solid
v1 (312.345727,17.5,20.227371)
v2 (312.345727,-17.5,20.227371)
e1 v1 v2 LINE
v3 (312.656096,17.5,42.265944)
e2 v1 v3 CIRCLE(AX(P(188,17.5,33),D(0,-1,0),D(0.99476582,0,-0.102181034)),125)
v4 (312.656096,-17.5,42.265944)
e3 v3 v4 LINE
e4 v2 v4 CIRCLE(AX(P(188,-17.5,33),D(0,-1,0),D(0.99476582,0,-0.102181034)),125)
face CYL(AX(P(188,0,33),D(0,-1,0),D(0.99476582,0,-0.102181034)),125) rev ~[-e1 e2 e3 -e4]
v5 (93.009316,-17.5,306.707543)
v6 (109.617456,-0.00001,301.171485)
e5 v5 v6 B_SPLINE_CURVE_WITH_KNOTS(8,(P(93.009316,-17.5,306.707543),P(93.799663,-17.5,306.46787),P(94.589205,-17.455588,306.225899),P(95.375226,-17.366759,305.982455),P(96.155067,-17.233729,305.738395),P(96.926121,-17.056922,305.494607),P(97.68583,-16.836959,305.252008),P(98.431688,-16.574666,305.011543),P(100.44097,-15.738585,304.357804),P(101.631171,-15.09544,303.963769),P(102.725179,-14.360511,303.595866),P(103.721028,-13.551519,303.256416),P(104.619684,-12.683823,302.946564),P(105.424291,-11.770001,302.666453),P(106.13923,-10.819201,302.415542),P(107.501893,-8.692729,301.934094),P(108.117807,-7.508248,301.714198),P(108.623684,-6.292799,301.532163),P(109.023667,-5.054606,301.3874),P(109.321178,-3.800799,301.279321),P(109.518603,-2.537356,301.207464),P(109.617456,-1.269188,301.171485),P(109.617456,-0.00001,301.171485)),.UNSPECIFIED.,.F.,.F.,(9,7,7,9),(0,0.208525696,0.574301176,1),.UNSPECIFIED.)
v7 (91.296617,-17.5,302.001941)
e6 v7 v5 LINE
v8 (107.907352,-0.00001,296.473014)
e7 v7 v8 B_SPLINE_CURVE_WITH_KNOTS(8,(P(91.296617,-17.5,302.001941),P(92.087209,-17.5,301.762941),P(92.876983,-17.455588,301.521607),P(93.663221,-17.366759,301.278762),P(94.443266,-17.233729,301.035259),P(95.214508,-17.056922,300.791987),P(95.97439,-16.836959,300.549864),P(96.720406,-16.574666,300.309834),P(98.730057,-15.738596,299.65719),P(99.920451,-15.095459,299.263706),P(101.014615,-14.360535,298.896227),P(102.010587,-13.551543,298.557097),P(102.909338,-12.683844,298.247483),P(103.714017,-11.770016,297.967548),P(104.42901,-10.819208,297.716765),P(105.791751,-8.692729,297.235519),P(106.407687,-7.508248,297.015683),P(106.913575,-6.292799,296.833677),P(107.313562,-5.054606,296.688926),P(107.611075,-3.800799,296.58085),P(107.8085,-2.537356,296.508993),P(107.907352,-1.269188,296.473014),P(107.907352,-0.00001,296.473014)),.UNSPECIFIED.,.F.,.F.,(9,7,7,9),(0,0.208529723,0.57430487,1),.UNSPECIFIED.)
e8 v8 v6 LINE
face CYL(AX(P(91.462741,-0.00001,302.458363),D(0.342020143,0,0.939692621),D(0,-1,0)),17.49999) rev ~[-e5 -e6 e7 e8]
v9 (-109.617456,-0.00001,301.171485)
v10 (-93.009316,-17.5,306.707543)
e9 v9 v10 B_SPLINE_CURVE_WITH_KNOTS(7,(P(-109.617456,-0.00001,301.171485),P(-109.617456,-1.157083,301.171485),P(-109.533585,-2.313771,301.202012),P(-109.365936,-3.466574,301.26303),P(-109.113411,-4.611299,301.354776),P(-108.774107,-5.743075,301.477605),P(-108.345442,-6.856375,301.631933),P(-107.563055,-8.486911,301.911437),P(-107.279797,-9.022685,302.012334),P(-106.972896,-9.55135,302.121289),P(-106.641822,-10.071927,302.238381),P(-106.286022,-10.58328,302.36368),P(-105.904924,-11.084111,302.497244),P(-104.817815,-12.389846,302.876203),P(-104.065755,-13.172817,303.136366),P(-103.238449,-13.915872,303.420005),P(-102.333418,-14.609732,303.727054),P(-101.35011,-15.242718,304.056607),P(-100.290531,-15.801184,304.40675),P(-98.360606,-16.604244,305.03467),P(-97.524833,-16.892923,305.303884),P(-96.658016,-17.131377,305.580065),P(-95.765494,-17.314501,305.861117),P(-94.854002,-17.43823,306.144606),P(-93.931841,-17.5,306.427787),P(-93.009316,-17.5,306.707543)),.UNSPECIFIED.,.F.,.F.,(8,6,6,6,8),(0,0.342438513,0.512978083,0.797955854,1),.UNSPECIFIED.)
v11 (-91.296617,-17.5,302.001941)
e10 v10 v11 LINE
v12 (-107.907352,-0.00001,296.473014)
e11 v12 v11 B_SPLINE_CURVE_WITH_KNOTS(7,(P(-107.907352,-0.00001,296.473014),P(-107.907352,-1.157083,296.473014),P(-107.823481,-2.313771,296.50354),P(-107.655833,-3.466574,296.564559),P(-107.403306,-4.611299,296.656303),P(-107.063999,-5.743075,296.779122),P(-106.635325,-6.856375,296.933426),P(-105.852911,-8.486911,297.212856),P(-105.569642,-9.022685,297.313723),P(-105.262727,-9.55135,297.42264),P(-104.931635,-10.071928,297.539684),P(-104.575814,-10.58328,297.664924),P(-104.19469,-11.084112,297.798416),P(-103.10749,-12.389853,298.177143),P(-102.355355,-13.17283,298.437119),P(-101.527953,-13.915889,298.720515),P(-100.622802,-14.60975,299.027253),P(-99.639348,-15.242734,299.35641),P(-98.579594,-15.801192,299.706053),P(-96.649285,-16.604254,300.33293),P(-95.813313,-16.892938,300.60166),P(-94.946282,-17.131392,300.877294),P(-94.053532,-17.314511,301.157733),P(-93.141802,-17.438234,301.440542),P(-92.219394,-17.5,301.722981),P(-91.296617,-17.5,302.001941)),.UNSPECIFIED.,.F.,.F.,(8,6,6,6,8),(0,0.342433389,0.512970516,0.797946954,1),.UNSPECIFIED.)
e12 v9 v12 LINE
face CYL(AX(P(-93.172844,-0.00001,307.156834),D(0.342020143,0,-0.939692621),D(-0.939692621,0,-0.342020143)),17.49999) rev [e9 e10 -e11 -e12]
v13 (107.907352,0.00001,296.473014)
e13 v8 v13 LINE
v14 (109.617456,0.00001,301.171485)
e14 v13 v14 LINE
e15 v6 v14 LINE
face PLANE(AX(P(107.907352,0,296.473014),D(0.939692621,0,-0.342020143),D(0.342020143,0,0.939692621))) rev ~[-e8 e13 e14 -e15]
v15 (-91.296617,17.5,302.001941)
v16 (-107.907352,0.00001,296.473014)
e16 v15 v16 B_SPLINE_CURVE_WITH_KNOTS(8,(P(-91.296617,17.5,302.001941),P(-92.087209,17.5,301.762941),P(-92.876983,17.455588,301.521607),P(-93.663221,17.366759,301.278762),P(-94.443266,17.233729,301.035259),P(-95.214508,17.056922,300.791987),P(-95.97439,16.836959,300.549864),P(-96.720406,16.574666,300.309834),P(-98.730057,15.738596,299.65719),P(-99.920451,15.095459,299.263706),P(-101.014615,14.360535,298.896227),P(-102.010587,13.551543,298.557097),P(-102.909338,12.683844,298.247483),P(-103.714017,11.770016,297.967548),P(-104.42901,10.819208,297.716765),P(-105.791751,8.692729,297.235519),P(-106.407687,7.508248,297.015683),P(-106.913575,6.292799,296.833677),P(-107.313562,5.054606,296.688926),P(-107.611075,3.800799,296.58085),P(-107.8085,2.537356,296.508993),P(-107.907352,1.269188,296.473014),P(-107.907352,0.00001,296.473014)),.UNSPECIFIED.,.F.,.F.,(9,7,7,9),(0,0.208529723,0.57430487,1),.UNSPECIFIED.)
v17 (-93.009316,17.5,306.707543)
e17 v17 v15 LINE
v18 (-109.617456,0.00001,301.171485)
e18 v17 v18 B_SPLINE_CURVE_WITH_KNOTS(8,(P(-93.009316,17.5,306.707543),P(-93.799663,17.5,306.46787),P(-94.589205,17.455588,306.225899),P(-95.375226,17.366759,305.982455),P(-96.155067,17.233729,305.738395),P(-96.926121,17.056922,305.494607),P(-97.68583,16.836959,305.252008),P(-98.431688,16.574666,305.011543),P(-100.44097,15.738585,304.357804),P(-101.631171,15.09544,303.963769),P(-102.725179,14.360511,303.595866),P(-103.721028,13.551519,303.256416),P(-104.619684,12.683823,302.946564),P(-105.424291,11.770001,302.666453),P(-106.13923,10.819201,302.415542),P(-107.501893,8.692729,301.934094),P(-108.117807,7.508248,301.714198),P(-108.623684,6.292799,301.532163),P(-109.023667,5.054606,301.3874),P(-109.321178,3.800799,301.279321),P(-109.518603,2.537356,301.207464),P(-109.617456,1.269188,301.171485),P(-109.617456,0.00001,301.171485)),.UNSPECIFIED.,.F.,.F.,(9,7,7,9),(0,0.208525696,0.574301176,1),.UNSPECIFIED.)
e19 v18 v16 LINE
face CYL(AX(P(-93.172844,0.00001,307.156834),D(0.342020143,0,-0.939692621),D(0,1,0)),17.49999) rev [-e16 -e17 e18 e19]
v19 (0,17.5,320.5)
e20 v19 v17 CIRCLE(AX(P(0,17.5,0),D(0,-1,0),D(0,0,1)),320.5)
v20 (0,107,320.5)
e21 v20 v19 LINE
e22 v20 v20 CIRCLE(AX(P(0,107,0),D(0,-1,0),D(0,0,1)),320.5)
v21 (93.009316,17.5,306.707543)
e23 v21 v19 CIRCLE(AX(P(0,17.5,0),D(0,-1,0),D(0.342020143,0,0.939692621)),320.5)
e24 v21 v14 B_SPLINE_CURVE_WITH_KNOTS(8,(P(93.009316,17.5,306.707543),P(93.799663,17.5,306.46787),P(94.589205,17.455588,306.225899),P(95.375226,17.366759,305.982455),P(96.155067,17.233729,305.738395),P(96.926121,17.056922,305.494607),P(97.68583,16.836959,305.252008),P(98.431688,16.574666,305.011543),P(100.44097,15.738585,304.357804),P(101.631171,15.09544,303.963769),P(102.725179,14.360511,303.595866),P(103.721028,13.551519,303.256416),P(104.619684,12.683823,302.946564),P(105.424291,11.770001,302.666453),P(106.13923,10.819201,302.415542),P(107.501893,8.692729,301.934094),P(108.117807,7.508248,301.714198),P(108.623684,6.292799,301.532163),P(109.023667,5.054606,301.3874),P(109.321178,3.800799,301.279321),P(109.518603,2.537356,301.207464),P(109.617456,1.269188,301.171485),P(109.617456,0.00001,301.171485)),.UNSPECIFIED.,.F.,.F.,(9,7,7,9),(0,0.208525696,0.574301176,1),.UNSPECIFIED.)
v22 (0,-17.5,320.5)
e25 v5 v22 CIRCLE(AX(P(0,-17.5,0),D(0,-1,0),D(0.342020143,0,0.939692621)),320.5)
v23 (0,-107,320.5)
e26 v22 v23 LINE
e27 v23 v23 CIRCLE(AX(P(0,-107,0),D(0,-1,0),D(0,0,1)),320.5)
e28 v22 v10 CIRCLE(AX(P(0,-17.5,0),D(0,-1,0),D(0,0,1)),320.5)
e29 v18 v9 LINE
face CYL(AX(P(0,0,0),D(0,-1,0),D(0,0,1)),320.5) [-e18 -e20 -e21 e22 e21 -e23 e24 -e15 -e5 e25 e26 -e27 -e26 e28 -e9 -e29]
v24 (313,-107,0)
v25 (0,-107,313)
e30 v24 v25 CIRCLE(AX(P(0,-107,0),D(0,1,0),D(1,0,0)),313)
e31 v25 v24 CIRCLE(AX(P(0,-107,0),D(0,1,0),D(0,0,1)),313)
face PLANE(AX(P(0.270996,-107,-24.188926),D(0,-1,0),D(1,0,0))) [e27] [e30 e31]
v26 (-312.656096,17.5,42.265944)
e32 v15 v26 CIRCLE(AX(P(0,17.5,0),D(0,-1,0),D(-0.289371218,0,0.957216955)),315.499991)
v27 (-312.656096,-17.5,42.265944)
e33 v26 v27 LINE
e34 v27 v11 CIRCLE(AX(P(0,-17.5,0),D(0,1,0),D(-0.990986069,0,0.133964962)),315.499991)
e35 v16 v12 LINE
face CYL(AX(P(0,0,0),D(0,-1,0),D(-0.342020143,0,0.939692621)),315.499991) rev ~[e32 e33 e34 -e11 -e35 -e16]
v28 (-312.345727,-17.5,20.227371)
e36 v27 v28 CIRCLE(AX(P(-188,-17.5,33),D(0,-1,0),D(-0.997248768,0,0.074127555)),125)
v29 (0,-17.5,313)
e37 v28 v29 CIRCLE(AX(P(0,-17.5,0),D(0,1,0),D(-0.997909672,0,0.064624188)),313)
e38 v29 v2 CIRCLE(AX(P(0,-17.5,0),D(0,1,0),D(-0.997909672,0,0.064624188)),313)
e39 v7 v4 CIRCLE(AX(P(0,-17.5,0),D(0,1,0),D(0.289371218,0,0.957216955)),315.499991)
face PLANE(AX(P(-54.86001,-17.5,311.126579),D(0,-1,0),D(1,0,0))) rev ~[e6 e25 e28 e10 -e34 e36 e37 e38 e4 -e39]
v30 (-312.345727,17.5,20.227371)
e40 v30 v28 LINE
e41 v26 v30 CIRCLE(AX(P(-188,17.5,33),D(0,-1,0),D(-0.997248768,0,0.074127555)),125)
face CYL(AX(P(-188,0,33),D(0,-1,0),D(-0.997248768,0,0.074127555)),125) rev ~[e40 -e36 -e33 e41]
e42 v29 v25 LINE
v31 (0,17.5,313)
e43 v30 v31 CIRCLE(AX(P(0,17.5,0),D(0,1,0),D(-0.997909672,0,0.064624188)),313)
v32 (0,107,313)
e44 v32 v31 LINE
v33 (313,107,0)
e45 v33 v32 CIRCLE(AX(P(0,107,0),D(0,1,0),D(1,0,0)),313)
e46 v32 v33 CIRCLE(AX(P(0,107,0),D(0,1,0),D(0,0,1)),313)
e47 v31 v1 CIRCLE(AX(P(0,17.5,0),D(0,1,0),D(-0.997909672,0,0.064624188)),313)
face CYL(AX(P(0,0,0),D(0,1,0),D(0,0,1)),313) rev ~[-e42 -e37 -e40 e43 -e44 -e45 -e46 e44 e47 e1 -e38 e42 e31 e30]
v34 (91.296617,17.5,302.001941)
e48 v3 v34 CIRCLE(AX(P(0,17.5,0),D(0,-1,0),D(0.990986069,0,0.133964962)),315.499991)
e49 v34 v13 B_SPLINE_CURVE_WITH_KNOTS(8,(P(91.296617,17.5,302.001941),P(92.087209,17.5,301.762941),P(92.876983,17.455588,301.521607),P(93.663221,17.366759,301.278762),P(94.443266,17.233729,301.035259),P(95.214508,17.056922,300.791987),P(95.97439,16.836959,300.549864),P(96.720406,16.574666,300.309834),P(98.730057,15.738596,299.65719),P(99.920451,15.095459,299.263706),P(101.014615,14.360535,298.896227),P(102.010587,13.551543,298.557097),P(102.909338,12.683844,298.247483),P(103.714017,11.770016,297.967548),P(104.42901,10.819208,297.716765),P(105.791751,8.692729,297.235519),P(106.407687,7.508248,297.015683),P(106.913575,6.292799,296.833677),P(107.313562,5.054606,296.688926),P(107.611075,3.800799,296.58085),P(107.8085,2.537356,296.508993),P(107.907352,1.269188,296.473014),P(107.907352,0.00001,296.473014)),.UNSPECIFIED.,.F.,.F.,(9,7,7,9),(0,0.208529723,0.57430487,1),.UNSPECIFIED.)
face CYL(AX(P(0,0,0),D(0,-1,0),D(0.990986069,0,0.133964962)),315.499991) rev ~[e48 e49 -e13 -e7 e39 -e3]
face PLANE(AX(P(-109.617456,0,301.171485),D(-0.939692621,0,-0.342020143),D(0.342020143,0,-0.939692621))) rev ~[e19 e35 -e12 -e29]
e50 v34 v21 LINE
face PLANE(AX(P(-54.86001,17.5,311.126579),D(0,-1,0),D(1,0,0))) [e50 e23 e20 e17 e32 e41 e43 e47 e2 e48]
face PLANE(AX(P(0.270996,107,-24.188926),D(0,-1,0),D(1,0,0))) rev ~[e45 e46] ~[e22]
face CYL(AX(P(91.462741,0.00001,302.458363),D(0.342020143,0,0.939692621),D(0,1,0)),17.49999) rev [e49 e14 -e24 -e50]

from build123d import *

# Parameters (mm, degrees)
F1_DEPTH = 107
F2_DEPTH = 17.5
F3_R     = 17.49999


# Not quite as in the source:
# - a fillet or chamfer is up to 0.001 mm smaller than in the source, because OpenCascade refuses the exact size


with BuildPart() as f1:
    # F0 (on Front) → F1 (new body, symmetric)
    with BuildSketch(Plane.XZ):
        with BuildLine():
            ThreePointArc((-109.6174559359, 301.1714849619), (-183.8312478505, -262.5382301946), (320.5, 0))
            ThreePointArc((320.5, 0), (262.5382301946, 183.8312478505), (109.6174559359, 301.1714849619))
            Line((109.6174559359, 301.1714849619), (107.9073522021, 296.4730135685))
            ThreePointArc((107.9073522021, 296.4730135685), (245.7106265432, 197.905362326), (312.6560960166, 42.2659444153))
            ThreePointArc((312.6560960166, 42.2659444153), (312.9876062183, 31.2398034738), (312.3457274768, 20.2273707381))
            ThreePointArc((312.3457274768, 20.2273707381), (312.836389108, 10.1189747444), (313, 0))
            ThreePointArc((313, 0), (-10.1189747444, -312.836389108), (-312.3457274768, 20.2273707381))
            ThreePointArc((-312.3457274768, 20.2273707381), (-312.9876062183, 31.2398034738), (-312.6560960166, 42.2659444153))
            ThreePointArc((-312.6560960166, 42.2659444153), (-245.7106265432, 197.905362326), (-107.9073522021, 296.4730135685))
            Line((-107.9073522021, 296.4730135685), (-109.6174559359, 301.1714849619))
        make_face()
        with BuildLine():
            Line((107.9073522021, 296.4730135685), (109.6174559359, 301.1714849619))
            ThreePointArc((109.6174559359, 301.1714849619), (55.6542409422, 315.6308848404), (0, 320.5))
            Line((0, 320.5), (0, 315.4999911785))
            ThreePointArc((0, 315.4999911785), (54.7859985221, 310.7068373879), (107.9073522021, 296.4730135685))
        make_face()
        with BuildLine():
            Line((-107.0523048609, 294.123790306), (-107.9073522021, 296.4730135685))
            ThreePointArc((-107.9073522021, 296.4730135685), (-245.7106265432, 197.905362326), (-312.6560960166, 42.2659444153))
            ThreePointArc((-312.6560960166, 42.2659444153), (-312.9876062183, 31.2398034738), (-312.3457274768, 20.2273707381))
            ThreePointArc((-312.3457274768, 20.2273707381), (-250.4565621924, 187.7245600735), (-107.0523048609, 294.123790306))
        make_face()
        with BuildLine():
            ThreePointArc((0, 320.5), (-55.6542409423, 315.6308848404), (-109.6174559359, 301.1714849619))
            Line((-109.6174559359, 301.1714849619), (-107.9073522021, 296.4730135685))
            ThreePointArc((-107.9073522021, 296.4730135685), (-54.7859985221, 310.7068373879), (0, 315.4999911785))
            Line((0, 315.4999911785), (0, 320.5))
        make_face()
        with BuildLine():
            ThreePointArc((312.6560960166, 42.2659444153), (245.7106265432, 197.905362326), (107.9073522021, 296.4730135685))
            Line((107.9073522021, 296.4730135685), (107.0523048609, 294.123790306))
            ThreePointArc((107.0523048609, 294.123790306), (250.4565621924, 187.7245600735), (312.3457274768, 20.2273707381))
            ThreePointArc((312.3457274768, 20.2273707381), (312.9876062183, 31.2398034738), (312.6560960166, 42.2659444153))
        make_face()
        with BuildLine():
            ThreePointArc((0, 315.4999911785), (-54.7859985221, 310.7068373879), (-107.9073522021, 296.4730135685))
            Line((-107.9073522021, 296.4730135685), (-107.0523048609, 294.123790306))
            ThreePointArc((-107.0523048609, 294.123790306), (-54.3518796098, 308.2448266928), (0, 313))
            Line((0, 313), (0, 315.4999911785))
        make_face()
        with BuildLine():
            Line((107.0523048609, 294.123790306), (107.9073522021, 296.4730135685))
            ThreePointArc((107.9073522021, 296.4730135685), (54.7859985221, 310.7068373879), (0, 315.4999911785))
            Line((0, 315.4999911785), (0, 313))
            ThreePointArc((0, 313), (54.3518796097, 308.2448266928), (107.0523048609, 294.123790306))
        make_face()
    extrude(amount=F1_DEPTH, both=True)

    # F0 (on Front) → F2 (cut, symmetric)
    with BuildSketch(Plane.XZ):
        with BuildLine():
            ThreePointArc((0, 320.5), (-55.6542409423, 315.6308848404), (-109.6174559359, 301.1714849619))
            Line((-109.6174559359, 301.1714849619), (-107.9073522021, 296.4730135685))
            ThreePointArc((-107.9073522021, 296.4730135685), (-54.7859985221, 310.7068373879), (0, 315.4999911785))
            Line((0, 315.4999911785), (0, 320.5))
        make_face()
        with BuildLine():
            Line((107.9073522021, 296.4730135685), (109.6174559359, 301.1714849619))
            ThreePointArc((109.6174559359, 301.1714849619), (55.6542409422, 315.6308848404), (0, 320.5))
            Line((0, 320.5), (0, 315.4999911785))
            ThreePointArc((0, 315.4999911785), (54.7859985221, 310.7068373879), (107.9073522021, 296.4730135685))
        make_face()
        with BuildLine():
            ThreePointArc((0, 315.4999911785), (-54.7859985221, 310.7068373879), (-107.9073522021, 296.4730135685))
            Line((-107.9073522021, 296.4730135685), (-107.0523048609, 294.123790306))
            ThreePointArc((-107.0523048609, 294.123790306), (-54.3518796098, 308.2448266928), (0, 313))
            Line((0, 313), (0, 315.4999911785))
        make_face()
        with BuildLine():
            Line((107.0523048609, 294.123790306), (107.9073522021, 296.4730135685))
            ThreePointArc((107.9073522021, 296.4730135685), (54.7859985221, 310.7068373879), (0, 315.4999911785))
            Line((0, 315.4999911785), (0, 313))
            ThreePointArc((0, 313), (54.3518796097, 308.2448266928), (107.0523048609, 294.123790306))
        make_face()
        with BuildLine():
            Line((-107.0523048609, 294.123790306), (-107.9073522021, 296.4730135685))
            ThreePointArc((-107.9073522021, 296.4730135685), (-245.7106265432, 197.905362326), (-312.6560960166, 42.2659444153))
            ThreePointArc((-312.6560960166, 42.2659444153), (-312.9876062183, 31.2398034738), (-312.3457274768, 20.2273707381))
            ThreePointArc((-312.3457274768, 20.2273707381), (-250.4565621924, 187.7245600735), (-107.0523048609, 294.123790306))
        make_face()
        with BuildLine():
            ThreePointArc((312.6560960166, 42.2659444153), (245.7106265432, 197.905362326), (107.9073522021, 296.4730135685))
            Line((107.9073522021, 296.4730135685), (107.0523048609, 294.123790306))
            ThreePointArc((107.0523048609, 294.123790306), (250.4565621924, 187.7245600735), (312.3457274768, 20.2273707381))
            ThreePointArc((312.3457274768, 20.2273707381), (312.9876062183, 31.2398034738), (312.6560960166, 42.2659444153))
        make_face()
    extrude(amount=F2_DEPTH, both=True, mode=Mode.SUBTRACT)

    # F3 (radius 17.5 in the source; OpenCascade refuses exactly that, so slightly less here)
    f3_edges = [f1.edges().sort_by_distance(p)[0] for p in [
        (-108.762404, 17.5, 298.822249),
        (108.762404, 17.5, 298.822249),
        (-108.762404, -17.5, 298.822249),
        (108.762404, -17.5, 298.822249),
    ]]
    fillet(f3_edges, radius=F3_R)


solid = f1.part
